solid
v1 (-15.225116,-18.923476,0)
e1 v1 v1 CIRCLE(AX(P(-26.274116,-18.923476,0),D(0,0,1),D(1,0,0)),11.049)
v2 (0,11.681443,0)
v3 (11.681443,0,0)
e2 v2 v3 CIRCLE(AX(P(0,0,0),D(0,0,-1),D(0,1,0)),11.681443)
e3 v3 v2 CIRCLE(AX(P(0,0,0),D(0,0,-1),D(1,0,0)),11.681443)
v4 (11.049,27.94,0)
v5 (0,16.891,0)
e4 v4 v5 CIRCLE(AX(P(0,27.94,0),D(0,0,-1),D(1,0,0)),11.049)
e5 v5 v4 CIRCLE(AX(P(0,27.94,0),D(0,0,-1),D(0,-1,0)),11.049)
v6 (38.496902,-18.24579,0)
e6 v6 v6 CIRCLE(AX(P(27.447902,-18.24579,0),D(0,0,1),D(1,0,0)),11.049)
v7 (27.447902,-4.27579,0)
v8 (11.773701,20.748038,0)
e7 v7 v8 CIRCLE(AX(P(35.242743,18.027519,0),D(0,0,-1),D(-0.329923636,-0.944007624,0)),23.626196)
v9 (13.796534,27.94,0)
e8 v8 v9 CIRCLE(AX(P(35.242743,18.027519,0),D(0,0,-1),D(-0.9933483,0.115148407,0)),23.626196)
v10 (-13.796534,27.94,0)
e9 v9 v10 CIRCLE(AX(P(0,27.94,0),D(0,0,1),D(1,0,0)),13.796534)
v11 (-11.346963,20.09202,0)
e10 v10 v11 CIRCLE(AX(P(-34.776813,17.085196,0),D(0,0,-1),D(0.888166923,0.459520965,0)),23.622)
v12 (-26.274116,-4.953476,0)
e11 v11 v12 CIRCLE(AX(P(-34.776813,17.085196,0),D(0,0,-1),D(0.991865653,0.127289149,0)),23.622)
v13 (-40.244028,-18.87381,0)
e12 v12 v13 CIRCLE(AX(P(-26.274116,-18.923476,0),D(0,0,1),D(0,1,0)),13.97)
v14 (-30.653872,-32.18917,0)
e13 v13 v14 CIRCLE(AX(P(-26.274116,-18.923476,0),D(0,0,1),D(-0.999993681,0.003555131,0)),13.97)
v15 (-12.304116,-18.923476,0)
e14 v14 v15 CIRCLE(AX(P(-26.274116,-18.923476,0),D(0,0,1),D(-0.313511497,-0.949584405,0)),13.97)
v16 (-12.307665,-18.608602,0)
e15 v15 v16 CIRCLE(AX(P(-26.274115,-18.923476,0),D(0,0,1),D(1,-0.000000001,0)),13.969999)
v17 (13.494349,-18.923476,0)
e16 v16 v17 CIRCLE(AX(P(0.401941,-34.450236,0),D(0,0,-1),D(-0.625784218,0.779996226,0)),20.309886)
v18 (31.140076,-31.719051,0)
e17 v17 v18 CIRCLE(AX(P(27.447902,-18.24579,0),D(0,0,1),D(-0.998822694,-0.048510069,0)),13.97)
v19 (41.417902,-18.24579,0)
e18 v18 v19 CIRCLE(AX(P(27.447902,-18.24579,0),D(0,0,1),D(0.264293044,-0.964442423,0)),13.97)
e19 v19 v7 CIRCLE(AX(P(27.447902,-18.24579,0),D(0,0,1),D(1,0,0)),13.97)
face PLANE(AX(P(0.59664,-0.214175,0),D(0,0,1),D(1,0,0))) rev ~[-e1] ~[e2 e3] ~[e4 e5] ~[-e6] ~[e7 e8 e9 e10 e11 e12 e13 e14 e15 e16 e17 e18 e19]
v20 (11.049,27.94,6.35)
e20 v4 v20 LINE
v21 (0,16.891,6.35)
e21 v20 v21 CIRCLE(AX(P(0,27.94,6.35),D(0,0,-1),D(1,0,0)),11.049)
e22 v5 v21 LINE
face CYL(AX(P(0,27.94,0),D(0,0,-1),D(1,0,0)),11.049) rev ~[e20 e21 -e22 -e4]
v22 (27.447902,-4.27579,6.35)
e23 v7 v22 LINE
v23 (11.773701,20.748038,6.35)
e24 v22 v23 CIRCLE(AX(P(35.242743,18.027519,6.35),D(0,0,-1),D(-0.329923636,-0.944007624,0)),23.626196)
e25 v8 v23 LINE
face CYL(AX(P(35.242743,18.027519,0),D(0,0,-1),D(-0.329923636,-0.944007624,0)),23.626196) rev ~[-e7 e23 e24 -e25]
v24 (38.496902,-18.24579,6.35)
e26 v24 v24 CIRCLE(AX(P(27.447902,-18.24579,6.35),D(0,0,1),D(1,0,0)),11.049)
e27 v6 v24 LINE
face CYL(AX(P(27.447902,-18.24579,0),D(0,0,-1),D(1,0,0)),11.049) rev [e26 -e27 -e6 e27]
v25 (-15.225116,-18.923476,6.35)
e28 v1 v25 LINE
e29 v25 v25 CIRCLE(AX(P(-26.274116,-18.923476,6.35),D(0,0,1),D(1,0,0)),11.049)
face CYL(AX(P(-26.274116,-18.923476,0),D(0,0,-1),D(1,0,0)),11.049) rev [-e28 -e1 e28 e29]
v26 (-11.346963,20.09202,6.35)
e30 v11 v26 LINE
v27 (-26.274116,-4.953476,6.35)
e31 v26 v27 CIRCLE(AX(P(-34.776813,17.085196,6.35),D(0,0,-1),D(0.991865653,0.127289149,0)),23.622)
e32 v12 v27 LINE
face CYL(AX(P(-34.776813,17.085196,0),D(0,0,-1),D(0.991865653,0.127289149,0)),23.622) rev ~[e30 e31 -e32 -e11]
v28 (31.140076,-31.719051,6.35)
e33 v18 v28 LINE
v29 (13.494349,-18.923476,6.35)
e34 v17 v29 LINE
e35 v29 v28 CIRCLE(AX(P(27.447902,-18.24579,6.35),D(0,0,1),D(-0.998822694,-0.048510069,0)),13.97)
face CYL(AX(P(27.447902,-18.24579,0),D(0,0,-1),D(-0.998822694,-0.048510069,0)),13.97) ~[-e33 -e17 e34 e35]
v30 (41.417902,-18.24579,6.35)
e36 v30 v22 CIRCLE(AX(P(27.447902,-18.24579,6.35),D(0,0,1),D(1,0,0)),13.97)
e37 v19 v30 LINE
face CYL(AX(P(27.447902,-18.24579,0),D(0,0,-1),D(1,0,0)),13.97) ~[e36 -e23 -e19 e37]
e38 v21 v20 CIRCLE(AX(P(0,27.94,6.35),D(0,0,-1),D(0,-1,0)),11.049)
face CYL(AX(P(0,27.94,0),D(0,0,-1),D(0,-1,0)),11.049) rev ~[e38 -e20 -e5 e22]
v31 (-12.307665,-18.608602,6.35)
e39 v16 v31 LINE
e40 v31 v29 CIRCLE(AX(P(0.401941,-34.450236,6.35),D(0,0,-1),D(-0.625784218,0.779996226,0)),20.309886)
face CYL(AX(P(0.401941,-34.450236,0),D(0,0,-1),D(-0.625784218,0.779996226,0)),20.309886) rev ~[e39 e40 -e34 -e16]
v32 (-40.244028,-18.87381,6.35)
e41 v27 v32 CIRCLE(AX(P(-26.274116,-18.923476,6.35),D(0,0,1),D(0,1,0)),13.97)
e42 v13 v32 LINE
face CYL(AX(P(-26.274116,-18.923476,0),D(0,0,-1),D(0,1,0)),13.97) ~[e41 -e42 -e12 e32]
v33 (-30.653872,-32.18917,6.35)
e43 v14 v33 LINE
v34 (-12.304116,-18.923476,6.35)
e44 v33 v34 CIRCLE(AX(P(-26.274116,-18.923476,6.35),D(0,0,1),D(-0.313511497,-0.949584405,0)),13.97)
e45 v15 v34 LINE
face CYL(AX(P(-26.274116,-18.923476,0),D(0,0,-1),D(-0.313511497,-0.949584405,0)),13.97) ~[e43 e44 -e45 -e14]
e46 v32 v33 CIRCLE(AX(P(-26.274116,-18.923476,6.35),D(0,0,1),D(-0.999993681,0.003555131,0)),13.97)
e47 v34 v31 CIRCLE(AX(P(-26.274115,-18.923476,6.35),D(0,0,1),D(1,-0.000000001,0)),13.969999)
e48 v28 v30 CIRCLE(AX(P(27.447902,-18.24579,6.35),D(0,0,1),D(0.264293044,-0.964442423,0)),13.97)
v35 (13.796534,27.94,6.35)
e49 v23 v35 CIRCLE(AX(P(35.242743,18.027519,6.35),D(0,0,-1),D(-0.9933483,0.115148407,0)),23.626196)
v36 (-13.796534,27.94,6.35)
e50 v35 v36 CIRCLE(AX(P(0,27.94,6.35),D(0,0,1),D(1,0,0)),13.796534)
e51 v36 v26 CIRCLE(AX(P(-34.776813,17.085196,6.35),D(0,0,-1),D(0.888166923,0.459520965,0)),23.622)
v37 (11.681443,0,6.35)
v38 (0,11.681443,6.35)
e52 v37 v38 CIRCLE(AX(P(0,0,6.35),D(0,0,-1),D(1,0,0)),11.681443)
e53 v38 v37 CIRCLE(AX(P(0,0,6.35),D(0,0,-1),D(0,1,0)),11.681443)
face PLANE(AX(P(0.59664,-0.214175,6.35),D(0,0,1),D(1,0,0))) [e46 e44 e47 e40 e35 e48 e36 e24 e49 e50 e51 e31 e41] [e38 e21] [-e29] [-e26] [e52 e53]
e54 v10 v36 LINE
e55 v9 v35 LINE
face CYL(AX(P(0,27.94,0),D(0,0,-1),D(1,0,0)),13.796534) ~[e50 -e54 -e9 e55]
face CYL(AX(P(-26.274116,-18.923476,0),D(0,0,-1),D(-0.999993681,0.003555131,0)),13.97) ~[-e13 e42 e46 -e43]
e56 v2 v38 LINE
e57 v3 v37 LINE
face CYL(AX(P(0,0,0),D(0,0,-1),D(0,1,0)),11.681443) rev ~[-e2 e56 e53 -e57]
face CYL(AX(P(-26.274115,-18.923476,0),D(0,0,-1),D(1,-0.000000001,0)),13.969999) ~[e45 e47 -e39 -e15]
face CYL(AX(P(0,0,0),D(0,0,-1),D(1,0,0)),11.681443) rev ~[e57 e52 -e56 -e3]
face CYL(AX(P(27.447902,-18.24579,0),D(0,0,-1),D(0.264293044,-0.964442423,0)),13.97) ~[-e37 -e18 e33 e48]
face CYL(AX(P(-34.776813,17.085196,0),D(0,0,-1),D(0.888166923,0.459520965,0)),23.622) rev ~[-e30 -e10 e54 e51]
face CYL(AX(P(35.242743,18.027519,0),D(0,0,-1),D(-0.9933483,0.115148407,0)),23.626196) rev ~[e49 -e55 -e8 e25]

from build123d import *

# Parameters (mm, degrees)
F0_R     = 11.049
F1_DEPTH = 6.35


with BuildPart() as f1:
    # F0 (on Top) → F1 (new body)
    with BuildSketch(Plane.XY):
        with BuildLine():
            ThreePointArc((-11.3469625039, 20.0920200438), (-14.4854082565, 4.9914875059), (-26.2741162088, -4.9534755149))
            ThreePointArc((-26.2741162088, -4.9534755149), (-16.5077935225, -8.934489521), (-12.3076651672, -18.6086020451))
            ThreePointArc((-12.3076651672, -18.6086020451), (0.649772882, -14.1418626943), (13.4943491716, -18.9234755149))
            ThreePointArc((13.4943491716, -18.9234755149), (17.3328597235, -8.6100846058), (27.4479022012, -4.2757898563))
            ThreePointArc((27.4479022012, -4.2757898563), (15.2201160848, 5.4859259906), (11.7737009685, 20.7480383092))
            ThreePointArc((11.7737009685, 20.7480383092), (6.7498223767, 15.9073674809), (0, 14.1434661071))
            ThreePointArc((0, 14.1434661071), (-6.4058342939, 15.720767845), (-11.3469625039, 20.0920200438))
        make_face()
        with BuildLine():
            ThreePointArc((13.97, 0), (-9.8782817332, -9.8782817332), (0, 13.97))
            ThreePointArc((0, 13.97), (9.8782817332, 9.8782817332), (13.97, 0))
        make_face(mode=Mode.SUBTRACT)
        with BuildLine():
            ThreePointArc((13.97, 0), (9.8782817332, 9.8782817332), (0, 13.97))
            ThreePointArc((0, 13.97), (-9.8782817332, -9.8782817332), (13.97, 0))
        make_face()
        with BuildLine():
            ThreePointArc((11.6814433874, 0), (-8.2600278333, -8.2600278333), (0, 11.6814433874))
            ThreePointArc((0, 11.6814433874), (8.2600278333, 8.2600278333), (11.6814433874, 0))
        make_face(mode=Mode.SUBTRACT)
        with BuildLine():
            ThreePointArc((-26.2741162088, -4.9534755149), (-36.1348230129, -9.0276500657), (-40.2440279254, -18.8738103292))
            ThreePointArc((-40.2440279254, -18.8738103292), (-36.068722537, -25.9778704776), (-30.6538718182, -32.1891696469))
            ThreePointArc((-30.6538718182, -32.1891696469), (-18.0895052181, -30.2448289204), (-12.3041162088, -18.9234755149))
            ThreePointArc((-12.3041162088, -18.9234755149), (-12.3050034765, -18.7660287802), (-12.3076651672, -18.6086020451))
            ThreePointArc((-12.3076651672, -18.6086020451), (-16.5077935225, -8.934489521), (-26.2741162088, -4.9534755149))
        make_face()
        with Locations((-26.2741162088, -18.9234755149)):
            Circle(F0_R, mode=Mode.SUBTRACT)
        with BuildLine():
            ThreePointArc((-13.7965338929, 27.94), (-12.227697713, 24.1233976847), (-11.3469625039, 20.0920200438))
            ThreePointArc((-11.3469625039, 20.0920200438), (-6.4058342939, 15.720767845), (0, 14.1434661071))
            ThreePointArc((0, 14.1434661071), (6.7498223767, 15.9073674809), (11.7737009685, 20.7480383092))
            ThreePointArc((11.7737009685, 20.7480383092), (12.4990400343, 24.4244821494), (13.7965338929, 27.94))
            ThreePointArc((13.7965338929, 27.94), (0, 41.7365338929), (-13.7965338929, 27.94))
        make_face()
        with BuildLine():
            ThreePointArc((11.049, 27.94), (7.8128228253, 20.1271771747), (0, 16.891))
            ThreePointArc((0, 16.891), (-7.8128228253, 35.7528228253), (11.049, 27.94))
        make_face(mode=Mode.SUBTRACT)
        with BuildLine():
            ThreePointArc((31.1400760327, -31.7190505009), (37.0174753812, -24.6070928067), (41.3000458498, -16.4349844175))
            ThreePointArc((41.3000458498, -16.4349844175), (36.6637566928, -7.7467934285), (27.4479022012, -4.2757898563))
            ThreePointArc((27.4479022012, -4.2757898563), (17.3328597235, -8.6100846058), (13.4943491716, -18.9234755149))
            ThreePointArc((13.4943491716, -18.9234755149), (19.2469473442, -29.5553097149), (31.1400760327, -31.7190505009))
        make_face()
        with Locations((27.4479022012, -18.2457898563)):
            Circle(F0_R, mode=Mode.SUBTRACT)
        with BuildLine():
            ThreePointArc((41.4179022012, -18.2457898563), (41.3884069763, -17.338471492), (41.3000458498, -16.4349844175))
            ThreePointArc((41.3000458498, -16.4349844175), (37.0174753812, -24.6070928067), (31.1400760327, -31.7190505009))
            ThreePointArc((31.1400760327, -31.7190505009), (38.5551198642, -26.7187241642), (41.4179022012, -18.2457898563))
        make_face()
        with BuildLine():
            ThreePointArc((-30.6538718182, -32.1891696469), (-36.068722537, -25.9778704776), (-40.2440279254, -18.8738103292))
            ThreePointArc((-40.2440279254, -18.8738103292), (-37.6100004347, -27.0879490936), (-30.6538718182, -32.1891696469))
        make_face()
    extrude(amount=F1_DEPTH)


solid = f1.part
